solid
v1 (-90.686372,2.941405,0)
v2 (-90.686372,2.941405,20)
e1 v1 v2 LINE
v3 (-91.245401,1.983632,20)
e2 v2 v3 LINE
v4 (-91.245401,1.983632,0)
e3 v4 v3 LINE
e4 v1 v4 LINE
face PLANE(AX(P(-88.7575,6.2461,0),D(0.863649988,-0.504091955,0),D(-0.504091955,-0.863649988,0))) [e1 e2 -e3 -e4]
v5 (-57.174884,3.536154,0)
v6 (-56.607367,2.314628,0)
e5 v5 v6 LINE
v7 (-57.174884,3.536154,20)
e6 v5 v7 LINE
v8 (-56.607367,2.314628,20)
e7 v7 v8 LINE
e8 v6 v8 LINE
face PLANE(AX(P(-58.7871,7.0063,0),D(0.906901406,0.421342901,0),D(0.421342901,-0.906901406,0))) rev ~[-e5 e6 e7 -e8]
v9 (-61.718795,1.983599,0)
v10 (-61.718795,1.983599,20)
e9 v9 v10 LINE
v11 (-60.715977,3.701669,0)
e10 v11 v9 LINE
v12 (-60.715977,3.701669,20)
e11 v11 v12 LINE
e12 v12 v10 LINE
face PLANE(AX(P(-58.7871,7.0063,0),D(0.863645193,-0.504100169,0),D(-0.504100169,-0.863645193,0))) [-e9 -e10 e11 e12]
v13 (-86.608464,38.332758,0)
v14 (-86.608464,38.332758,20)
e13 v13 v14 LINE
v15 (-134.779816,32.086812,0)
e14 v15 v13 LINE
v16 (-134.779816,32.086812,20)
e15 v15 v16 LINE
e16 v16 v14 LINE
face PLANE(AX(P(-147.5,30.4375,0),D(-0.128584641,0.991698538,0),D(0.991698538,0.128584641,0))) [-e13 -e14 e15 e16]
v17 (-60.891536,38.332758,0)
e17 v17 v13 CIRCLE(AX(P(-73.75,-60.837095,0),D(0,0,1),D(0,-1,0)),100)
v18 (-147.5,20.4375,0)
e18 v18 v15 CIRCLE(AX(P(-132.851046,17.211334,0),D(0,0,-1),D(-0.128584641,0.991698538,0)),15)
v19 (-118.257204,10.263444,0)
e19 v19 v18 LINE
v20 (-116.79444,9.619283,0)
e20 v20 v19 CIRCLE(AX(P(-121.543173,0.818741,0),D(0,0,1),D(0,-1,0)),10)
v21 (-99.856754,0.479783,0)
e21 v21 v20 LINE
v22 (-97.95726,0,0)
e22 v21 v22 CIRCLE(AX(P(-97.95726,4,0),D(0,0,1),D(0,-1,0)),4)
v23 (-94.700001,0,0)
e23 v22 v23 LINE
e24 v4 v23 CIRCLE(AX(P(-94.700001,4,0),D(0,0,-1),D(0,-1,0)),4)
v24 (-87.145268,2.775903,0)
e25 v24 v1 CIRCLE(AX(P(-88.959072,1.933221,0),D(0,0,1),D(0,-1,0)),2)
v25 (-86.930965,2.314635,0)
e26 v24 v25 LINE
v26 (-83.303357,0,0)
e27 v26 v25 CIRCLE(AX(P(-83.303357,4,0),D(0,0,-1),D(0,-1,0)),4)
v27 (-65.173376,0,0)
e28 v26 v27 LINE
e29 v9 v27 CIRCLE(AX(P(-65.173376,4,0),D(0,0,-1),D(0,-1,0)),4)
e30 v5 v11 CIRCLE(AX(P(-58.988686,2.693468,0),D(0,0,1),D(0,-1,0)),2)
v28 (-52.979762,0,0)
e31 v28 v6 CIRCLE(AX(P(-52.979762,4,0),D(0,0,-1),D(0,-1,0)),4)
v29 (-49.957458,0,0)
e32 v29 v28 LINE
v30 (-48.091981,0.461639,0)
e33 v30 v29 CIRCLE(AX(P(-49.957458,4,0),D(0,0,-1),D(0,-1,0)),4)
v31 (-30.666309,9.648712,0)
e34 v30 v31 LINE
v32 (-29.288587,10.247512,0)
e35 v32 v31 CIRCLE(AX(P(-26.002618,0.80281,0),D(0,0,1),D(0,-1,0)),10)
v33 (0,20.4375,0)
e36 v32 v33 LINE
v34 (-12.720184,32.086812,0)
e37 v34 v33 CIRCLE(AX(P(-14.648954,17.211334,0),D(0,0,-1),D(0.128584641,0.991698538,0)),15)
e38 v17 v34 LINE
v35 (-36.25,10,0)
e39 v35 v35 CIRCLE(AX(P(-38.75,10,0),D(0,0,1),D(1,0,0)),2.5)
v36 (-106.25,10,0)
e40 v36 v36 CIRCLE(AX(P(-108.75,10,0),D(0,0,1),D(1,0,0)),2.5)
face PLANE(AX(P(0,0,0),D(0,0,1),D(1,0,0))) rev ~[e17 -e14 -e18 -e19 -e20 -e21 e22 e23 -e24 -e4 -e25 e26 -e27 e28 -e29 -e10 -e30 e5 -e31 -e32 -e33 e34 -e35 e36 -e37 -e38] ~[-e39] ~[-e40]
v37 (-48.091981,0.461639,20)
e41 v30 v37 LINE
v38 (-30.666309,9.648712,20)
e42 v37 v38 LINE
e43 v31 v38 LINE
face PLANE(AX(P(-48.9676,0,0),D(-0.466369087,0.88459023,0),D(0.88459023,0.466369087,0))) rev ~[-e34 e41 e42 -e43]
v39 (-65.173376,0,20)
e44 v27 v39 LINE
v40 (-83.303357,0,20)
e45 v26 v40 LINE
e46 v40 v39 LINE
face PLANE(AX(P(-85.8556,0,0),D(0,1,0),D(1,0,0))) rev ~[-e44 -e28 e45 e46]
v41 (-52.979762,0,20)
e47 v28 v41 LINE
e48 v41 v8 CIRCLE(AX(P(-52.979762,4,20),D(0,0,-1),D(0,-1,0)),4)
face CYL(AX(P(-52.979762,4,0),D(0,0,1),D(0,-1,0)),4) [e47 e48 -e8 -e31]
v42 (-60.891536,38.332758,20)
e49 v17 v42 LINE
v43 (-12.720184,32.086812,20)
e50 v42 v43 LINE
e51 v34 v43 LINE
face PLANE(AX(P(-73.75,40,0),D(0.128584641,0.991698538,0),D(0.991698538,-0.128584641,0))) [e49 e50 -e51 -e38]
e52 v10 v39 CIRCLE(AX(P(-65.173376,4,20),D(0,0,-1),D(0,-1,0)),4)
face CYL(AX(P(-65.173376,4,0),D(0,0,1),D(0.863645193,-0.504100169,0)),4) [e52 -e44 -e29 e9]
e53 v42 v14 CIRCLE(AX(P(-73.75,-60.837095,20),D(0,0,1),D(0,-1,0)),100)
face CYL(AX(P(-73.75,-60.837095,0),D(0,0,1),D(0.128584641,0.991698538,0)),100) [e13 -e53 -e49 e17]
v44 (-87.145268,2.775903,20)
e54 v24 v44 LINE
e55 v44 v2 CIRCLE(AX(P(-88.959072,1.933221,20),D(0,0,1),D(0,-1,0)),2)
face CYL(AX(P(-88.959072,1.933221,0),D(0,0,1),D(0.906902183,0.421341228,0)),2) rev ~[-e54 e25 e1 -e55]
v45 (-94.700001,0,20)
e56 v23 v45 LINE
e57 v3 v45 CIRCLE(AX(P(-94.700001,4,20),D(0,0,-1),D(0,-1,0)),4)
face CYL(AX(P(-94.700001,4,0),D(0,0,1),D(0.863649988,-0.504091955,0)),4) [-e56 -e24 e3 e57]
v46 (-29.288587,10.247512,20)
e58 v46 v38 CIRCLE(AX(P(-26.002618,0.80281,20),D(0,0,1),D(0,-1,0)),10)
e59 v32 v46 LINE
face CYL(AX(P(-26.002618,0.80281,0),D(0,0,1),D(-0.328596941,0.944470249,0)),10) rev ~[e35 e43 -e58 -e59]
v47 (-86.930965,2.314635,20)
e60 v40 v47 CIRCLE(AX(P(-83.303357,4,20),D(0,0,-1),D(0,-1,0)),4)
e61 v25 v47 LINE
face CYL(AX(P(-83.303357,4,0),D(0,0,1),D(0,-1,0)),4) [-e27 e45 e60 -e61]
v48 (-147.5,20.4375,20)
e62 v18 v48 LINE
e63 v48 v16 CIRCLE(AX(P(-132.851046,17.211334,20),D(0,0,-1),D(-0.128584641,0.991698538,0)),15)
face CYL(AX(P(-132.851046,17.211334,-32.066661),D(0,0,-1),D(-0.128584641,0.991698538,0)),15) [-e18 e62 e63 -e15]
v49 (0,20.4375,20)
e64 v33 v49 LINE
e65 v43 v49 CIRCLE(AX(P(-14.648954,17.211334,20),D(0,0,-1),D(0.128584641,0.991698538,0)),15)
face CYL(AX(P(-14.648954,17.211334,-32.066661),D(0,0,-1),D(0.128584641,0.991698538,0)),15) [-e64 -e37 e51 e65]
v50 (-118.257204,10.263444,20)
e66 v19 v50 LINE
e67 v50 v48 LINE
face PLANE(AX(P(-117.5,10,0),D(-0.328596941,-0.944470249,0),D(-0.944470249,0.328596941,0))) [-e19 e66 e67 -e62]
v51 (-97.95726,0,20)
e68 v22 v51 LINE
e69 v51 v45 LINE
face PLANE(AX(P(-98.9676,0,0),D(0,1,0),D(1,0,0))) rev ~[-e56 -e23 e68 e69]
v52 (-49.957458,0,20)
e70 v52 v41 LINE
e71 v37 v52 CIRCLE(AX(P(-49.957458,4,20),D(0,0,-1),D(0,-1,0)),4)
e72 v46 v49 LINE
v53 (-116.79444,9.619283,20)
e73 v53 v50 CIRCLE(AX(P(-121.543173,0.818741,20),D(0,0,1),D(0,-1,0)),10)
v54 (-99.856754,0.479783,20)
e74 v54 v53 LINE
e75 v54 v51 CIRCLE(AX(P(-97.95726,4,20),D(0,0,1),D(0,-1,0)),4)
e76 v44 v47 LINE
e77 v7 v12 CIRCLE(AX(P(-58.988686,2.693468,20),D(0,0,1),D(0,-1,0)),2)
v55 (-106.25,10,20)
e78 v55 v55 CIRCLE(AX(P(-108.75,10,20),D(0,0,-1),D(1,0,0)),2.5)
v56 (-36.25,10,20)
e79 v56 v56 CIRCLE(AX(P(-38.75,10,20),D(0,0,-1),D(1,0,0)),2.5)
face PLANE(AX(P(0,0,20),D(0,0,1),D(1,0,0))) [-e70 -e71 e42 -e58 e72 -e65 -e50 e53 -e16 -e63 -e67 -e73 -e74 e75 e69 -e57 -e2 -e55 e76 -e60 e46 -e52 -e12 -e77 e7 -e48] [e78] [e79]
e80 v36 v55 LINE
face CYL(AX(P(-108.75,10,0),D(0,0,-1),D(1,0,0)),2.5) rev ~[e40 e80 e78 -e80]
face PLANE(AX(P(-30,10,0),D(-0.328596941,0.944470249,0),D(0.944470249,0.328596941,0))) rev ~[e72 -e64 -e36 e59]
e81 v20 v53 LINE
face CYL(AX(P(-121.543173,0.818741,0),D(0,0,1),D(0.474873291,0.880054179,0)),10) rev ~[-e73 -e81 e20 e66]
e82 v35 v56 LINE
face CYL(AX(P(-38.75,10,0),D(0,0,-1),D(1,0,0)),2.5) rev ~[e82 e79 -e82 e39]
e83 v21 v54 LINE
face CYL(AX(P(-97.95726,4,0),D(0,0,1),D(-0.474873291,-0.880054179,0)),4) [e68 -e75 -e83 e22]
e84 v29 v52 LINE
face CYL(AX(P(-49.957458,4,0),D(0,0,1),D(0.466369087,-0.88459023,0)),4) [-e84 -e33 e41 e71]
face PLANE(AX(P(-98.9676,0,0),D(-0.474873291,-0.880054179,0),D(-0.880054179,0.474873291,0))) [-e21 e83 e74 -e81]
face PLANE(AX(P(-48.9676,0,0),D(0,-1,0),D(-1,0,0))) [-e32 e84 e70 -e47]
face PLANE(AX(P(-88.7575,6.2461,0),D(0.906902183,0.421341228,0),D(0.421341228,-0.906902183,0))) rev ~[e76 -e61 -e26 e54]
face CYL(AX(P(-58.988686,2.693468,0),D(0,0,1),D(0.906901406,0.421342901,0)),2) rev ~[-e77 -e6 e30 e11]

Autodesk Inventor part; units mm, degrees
ref_plane "YZ Plane" through (0, 0, 0) normal (1, 0, 0) x (0, 1, 0)
ref_plane "XZ Plane" through (0, 0, 0) normal (0, 1, 0) x (-1, 0, 0)
ref_plane "XY Plane" through (0, 0, 0) normal (0, 0, 1) x (1, 0, 0)
sketch "Sketch1" plane through (0, 0, 0) normal (0, 0, 1) x (1, 0, 0)
  line L0 (0, 0) -> (-48.9676, 0)
  line L1 (-147.5, 0) -> (-147.5, 20.4375)
  line L2 (-147.5, 40) -> (-73.75, 40)
  line L3 (0, 40) -> (0, 30.4375)
  line L4 (-108.75, 10) -> (-38.75, 10)
  line L5 (-108.75, 10) -> (-117.5, 10)
  line L6 (-38.75, 10) -> (-30, 10)
  line L7 (-98.9676, 0) -> (-92.4032, 0)
  line L8 (-147.5, 0) -> (-98.9676, 0)
  line L9 (-48.9676, 0) -> (0, 0)
  line L10 (-147.5, 10) -> (-117.5, 10)
  line L11 (0, 10) -> (-30, 10)
  line L12 (-98.9676, 0) -> (-117.5, 10)
  line L13 (-48.9676, 0) -> (-30, 10)
  line L14 (-117.5, 10) -> (-147.5, 10)
  line L15 (-30, 10) -> (0, 10)
  circle A0 centre (-108.75, 10) radius 2.5
  circle A1 centre (-38.75, 10) radius 2.5
  line L16 (-147.5, 10) -> (-147.5, 20.4375)
  line L17 (-117.5, 10) -> (-147.5, 20.4375)
  line L18 (0, 10) -> (0, 20.4375)
  line L19 (0, 20.4375) -> (-147.5, 20.4375)
  line L20 (-30, 10) -> (0, 20.4375)
  line L21 (-147.5, 20.4375) -> (-147.5, 30.4375)
  line L22 (-147.5, 30.4375) -> (-73.75, 40)
  line L23 (0, 20.4375) -> (0, 30.4375)
  line L24 (-73.75, 40) -> (0, 30.4375)
  line L25 (0, 20.4375) -> (0, 0)
  line L26 (0, 30.4375) -> (0, 20.4375)
  line L27 (-147.5, 30.4375) -> (-147.5, 40)
  line L28 (-147.5, 20.4375) -> (-147.5, 30.4375)
  line L29 (-73.75, 40) -> (0, 40)
  line L30 (-88.7871, 0) -> (-58.7871, 0)
  line L31 (-88.7575, 0) -> (-58.7871, 0)
  line L32 (-88.7575, 0) -> (-88.7575, 6.2461)
  line L33 (-58.7871, 0) -> (-58.7871, 7.0063)
  line L34 (-58.7871, 7.0063) -> (-62.8766, 0)
  line L35 (-58.7871, 7.0063) -> (-55.532, 0)
  line L36 (-88.7575, 6.2461) -> (-85.8556, 0)
  line L37 (-88.7575, 6.2461) -> (-92.4032, 0)
  line L38 (-58.7871, 0) -> (-55.532, 0)
  line L39 (-92.4032, 0) -> (-147.5, 0)
  line L40 (-48.9676, 0) -> (-55.532, 0)
  line L41 (-55.532, 0) -> (-92.4032, 0)
  line L42 (-92.4032, 0) -> (-88.7575, 0)
  line L43 (-55.532, 0) -> (-48.9676, 0)
  point P0 (-73.75, 0)
  point P1 (-85.8556, 0)
  dimension "d0" = 147.5
  dimension "d1" = 40
  dimension "d2" = 70
  dimension "d3" = 10
  dimension "d4" = 50
  dimension "d5" = 30
  dimension "d6" = 30
  dimension "d7" = 5
  dimension "d8" = 5
  dimension "d9" = 10
  dimension "d10" = 30
extrude "Extrusion2" add sketch "Sketch1" along normal blind 20 contours L40 L35 L34 L30 L36 L37 L7 L12 L5 A0 L4 A1 L6 L13 | L6 A1 L4 A0 L5 L17 L19 L20 | L19 L21 L22 L24 L23
fillet "Fillet5" radius 100 1 edges at (-73.75, 40, 10)
fillet "Fillet6" radius 15 2 edges at (0, 30.4375, 10) (-147.5, 30.4375, 10)
fillet "Fillet7" radius 10 2 edges at (-117.5, 10, 10) (-30, 10, 10)
fillet "Fillet8" radius 4 6 edges at (-98.9676, 0, 10) (-92.4032, 0, 10) (-55.532, 0, 10) (-48.9676, 0, 10) (-85.8556, 0, 10) (-62.8766, 0, 10)
fillet "Fillet9" radius 2 2 edges at (-88.7575, 6.2461, 10) (-58.7871, 7.0063, 10)
properties part number "bumper" material "Polystyrene, Expanded"
